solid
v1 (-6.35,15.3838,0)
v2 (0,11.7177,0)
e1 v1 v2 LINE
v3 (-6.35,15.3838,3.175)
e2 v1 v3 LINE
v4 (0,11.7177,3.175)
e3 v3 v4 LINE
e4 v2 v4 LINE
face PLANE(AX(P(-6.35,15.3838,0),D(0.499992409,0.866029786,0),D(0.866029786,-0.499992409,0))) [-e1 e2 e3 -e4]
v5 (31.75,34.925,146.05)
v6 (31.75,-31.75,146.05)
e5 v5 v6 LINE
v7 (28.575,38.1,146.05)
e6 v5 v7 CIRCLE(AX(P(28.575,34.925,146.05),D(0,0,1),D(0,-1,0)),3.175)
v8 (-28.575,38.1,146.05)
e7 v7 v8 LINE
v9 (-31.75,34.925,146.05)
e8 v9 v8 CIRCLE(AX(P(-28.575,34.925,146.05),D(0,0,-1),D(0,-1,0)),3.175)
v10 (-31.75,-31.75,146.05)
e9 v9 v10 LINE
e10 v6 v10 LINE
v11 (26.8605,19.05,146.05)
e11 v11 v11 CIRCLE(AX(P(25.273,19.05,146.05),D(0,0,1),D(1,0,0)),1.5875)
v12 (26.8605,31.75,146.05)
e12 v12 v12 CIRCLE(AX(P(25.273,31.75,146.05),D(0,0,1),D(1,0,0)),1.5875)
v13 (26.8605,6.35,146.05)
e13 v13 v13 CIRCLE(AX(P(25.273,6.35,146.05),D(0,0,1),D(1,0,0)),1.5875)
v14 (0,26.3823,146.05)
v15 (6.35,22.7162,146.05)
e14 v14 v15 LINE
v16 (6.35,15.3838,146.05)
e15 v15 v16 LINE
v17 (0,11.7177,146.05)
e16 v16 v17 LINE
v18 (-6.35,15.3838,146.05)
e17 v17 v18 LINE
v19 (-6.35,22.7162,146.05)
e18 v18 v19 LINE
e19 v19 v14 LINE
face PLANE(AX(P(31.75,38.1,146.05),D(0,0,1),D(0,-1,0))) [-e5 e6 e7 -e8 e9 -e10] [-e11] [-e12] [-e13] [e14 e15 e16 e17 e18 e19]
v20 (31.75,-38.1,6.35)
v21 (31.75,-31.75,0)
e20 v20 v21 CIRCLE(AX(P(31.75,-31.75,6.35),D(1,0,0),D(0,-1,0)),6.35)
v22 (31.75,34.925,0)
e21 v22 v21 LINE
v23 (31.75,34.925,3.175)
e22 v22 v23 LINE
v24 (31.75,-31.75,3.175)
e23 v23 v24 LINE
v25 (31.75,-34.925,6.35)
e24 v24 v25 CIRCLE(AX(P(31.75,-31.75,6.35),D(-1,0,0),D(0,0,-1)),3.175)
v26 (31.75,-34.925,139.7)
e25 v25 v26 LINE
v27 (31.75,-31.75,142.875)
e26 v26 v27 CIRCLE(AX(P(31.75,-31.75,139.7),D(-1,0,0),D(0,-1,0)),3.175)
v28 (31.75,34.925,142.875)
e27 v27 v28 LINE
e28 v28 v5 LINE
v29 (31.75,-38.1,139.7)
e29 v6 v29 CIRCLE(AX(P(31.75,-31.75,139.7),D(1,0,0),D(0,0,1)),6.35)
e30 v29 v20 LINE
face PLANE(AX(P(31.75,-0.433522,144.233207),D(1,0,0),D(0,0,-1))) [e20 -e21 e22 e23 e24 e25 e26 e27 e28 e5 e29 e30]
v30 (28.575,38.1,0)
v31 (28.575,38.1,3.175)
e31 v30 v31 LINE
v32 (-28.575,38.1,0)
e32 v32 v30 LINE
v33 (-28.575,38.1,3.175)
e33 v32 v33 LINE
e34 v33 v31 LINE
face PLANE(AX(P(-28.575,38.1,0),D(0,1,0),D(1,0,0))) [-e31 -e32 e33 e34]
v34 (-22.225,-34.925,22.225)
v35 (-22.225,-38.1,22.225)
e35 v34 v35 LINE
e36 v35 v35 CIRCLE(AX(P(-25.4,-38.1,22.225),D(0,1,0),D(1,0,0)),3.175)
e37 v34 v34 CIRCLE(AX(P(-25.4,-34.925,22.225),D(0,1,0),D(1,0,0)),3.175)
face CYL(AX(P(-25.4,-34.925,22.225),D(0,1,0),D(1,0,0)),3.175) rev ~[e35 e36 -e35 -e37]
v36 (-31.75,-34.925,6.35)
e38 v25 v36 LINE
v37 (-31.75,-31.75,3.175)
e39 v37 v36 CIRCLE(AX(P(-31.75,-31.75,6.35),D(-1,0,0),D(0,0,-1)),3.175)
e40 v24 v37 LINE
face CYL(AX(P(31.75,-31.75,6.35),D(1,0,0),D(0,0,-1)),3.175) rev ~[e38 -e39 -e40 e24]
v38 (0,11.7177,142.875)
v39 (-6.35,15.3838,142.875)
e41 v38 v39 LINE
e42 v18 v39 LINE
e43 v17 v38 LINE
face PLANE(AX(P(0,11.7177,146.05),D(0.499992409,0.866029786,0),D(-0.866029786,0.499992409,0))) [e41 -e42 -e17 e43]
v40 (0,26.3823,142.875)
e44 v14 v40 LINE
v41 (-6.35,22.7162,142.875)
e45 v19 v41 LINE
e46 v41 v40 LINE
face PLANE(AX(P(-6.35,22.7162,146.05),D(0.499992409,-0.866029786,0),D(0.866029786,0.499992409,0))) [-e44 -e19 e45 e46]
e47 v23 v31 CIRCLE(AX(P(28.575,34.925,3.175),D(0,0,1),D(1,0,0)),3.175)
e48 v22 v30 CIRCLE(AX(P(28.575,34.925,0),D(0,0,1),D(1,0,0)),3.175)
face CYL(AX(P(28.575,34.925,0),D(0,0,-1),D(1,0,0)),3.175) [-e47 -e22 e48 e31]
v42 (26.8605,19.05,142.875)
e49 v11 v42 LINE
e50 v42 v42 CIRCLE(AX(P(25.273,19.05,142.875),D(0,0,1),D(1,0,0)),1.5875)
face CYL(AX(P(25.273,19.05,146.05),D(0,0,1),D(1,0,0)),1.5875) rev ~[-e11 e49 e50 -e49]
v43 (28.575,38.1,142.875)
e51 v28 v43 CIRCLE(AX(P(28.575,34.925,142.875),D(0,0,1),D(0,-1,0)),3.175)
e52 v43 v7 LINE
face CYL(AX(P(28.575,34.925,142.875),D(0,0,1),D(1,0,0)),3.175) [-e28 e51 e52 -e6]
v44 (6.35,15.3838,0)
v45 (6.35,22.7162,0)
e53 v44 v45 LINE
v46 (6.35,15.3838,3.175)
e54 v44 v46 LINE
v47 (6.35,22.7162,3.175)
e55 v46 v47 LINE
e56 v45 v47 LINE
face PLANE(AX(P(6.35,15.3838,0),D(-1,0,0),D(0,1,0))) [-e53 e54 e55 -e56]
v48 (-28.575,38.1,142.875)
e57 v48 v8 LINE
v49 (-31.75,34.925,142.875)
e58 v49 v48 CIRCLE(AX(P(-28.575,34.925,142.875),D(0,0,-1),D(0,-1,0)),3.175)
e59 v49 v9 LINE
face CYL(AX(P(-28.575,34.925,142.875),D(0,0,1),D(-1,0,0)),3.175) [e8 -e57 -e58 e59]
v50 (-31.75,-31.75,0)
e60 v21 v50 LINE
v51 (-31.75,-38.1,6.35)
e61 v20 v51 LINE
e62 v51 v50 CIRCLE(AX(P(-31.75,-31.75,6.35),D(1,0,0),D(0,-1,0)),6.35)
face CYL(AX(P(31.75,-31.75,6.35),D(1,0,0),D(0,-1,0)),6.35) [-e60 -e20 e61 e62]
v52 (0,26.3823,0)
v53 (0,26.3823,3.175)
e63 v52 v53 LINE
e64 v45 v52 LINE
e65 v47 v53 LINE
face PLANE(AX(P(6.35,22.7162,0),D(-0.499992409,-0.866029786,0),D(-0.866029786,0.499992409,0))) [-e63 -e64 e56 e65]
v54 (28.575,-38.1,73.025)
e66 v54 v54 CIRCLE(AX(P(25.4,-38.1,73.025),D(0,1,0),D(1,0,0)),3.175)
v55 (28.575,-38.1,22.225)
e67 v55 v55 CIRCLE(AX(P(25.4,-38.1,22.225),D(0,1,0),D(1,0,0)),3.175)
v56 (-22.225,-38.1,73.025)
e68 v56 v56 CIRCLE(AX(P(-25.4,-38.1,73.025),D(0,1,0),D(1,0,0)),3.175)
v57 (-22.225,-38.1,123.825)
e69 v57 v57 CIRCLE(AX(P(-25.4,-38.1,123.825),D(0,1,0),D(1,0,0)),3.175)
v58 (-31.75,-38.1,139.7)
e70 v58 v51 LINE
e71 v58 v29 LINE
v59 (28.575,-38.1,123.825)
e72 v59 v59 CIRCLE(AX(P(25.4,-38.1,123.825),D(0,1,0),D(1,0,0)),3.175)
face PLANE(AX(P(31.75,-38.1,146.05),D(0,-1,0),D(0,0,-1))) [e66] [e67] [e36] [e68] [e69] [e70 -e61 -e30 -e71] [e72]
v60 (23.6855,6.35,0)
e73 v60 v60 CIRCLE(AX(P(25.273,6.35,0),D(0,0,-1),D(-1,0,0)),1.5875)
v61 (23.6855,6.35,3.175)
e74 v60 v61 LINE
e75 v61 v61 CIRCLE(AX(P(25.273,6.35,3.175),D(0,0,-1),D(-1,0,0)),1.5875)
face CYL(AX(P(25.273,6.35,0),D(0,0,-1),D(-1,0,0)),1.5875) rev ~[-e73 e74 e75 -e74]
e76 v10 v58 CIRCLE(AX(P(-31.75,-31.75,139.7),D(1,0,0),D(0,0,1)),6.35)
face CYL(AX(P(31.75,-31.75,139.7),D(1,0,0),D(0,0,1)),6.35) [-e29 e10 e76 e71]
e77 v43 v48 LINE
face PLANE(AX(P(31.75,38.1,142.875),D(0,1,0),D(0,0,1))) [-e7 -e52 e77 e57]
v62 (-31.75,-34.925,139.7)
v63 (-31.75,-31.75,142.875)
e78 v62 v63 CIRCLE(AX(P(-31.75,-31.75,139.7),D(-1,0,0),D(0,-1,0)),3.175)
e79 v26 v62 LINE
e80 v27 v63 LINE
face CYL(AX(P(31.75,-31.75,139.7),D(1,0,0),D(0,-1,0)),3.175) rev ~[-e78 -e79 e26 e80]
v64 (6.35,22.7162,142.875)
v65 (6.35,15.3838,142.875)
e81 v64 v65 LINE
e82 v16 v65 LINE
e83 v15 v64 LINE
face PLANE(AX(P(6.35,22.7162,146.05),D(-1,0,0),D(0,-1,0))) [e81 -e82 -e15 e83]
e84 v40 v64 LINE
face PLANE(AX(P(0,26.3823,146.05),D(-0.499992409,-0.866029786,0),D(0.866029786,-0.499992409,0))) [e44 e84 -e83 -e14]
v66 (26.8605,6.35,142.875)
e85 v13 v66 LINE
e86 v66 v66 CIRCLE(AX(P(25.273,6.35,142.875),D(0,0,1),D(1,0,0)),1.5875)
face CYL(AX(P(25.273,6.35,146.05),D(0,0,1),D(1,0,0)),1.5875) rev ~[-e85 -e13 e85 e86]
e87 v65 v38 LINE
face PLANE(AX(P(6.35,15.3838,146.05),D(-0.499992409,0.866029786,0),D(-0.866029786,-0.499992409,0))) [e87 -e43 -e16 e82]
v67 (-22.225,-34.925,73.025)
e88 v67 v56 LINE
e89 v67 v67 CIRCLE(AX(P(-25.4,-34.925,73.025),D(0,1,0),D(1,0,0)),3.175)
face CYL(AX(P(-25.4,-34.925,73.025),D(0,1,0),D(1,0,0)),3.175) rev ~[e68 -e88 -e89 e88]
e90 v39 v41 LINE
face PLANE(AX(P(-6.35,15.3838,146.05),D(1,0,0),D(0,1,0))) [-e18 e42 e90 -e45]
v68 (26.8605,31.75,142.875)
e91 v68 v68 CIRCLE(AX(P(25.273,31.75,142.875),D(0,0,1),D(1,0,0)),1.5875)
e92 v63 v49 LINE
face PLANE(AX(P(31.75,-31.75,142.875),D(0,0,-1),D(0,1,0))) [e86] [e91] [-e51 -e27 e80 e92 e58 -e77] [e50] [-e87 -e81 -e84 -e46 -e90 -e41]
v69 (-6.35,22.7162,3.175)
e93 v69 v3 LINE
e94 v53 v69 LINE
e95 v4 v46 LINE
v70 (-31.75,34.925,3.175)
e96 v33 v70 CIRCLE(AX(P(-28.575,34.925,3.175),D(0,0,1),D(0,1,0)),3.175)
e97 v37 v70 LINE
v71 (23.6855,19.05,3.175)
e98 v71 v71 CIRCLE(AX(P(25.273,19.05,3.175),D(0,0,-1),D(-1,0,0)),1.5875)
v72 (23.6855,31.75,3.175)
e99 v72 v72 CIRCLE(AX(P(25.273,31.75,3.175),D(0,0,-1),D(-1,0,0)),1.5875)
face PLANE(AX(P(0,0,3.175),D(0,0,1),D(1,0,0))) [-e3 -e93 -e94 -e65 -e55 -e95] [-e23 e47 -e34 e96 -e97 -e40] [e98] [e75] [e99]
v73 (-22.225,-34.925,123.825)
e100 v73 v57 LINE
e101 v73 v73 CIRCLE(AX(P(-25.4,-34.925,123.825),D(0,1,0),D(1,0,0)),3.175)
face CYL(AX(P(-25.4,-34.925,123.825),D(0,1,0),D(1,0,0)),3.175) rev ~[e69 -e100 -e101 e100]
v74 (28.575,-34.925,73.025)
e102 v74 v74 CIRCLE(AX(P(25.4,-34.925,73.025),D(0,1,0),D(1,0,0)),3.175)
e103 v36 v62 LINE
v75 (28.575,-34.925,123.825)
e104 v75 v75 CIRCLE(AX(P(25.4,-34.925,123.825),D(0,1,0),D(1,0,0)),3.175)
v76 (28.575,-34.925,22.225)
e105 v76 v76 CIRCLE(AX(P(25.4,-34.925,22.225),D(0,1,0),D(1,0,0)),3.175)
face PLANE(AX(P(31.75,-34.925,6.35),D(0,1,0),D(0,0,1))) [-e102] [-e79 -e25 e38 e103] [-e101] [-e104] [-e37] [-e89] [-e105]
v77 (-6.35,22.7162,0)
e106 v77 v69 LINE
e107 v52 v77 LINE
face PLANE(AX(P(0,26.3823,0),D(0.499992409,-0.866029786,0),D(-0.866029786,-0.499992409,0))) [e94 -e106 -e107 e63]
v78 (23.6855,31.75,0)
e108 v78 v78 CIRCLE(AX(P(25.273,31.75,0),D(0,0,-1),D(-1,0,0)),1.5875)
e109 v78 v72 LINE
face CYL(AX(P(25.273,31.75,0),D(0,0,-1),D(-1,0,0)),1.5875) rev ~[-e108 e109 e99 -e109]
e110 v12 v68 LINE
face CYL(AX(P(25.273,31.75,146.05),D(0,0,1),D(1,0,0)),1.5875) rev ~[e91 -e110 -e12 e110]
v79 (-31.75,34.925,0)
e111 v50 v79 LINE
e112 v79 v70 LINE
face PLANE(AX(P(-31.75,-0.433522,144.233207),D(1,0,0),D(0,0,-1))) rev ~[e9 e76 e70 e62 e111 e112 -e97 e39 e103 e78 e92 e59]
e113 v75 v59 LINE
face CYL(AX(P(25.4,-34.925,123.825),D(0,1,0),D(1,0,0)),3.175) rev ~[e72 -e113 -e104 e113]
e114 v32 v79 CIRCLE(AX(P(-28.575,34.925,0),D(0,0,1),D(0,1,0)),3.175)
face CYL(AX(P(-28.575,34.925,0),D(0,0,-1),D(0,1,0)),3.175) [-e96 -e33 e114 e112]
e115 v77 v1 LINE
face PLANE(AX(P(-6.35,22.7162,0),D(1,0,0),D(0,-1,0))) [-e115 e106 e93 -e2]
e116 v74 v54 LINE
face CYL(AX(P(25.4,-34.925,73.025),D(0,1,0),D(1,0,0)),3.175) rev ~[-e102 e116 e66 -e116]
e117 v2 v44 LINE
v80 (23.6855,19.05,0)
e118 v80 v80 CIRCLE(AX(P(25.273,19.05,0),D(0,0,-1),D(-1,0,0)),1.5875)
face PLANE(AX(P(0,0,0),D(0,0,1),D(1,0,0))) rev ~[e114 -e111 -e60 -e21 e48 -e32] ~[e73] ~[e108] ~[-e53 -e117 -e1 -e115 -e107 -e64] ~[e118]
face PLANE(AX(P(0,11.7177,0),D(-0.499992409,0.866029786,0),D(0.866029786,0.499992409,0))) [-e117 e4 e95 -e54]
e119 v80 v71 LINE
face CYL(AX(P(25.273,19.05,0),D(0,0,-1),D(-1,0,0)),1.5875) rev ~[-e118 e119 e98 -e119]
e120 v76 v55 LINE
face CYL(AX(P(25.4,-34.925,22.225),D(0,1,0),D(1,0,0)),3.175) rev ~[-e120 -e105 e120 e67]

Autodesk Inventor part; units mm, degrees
ref_plane "YZ Plane" through (0, 0, 0) normal (1, 0, 0) x (0, 1, 0)
ref_plane "XZ Plane" through (0, 0, 0) normal (0, 1, 0) x (-1, 0, 0)
ref_plane "XY Plane" through (0, 0, 0) normal (0, 0, 1) x (1, 0, 0)
sketch "Sketch1" plane through (0, 0, 0) normal (0, 0, 1) x (1, 0, 0)
  line L0 (31.75, -38.1) -> (-31.75, -38.1)
  line L1 (-31.75, -38.1) -> (-31.75, 34.925)
  line L2 (-28.575, 38.1) -> (28.575, 38.1)
  line L3 (31.75, 34.925) -> (31.75, -38.1)
  line L4 (31.75, -38.1) -> (-31.75, 38.1) construction
  line L5 (-31.75, -38.1) -> (31.75, 38.1) construction
  arc A0 (31.75, 34.925) -> (28.575, 38.1) centre (28.575, 34.925) ccw
  arc A1 (-28.575, 38.1) -> (-31.75, 34.925) centre (-28.575, 34.925) ccw
  point P0 (0, 0)
  dimension "d0" = 63.5
  dimension "d1" = 76.2
  dimension "d18" = 3.175
extrude "Plate1" add sketch "Sketch1" along normal blind 3.175
sketch "Sketch2" plane through (31.75, -34.925, 0) normal (0, -1, 0) x (1, 0, 0)
  line L0 (-63.5, 0) -> (0, 0)
  line L1 (0, 0) -> (0, 146.05)
  line L2 (0, 146.05) -> (-63.5, 146.05)
  line L3 (-63.5, 146.05) -> (-63.5, 0)
edge flange "Flange1" height 146.05 angle 90 thickness 3.175 bend radius 3.175 thickness toward (0, -1, 0) relief tear relief width 3.175 relief depth 1.5875 edges at (0, -38.1, 3.175) wall of the first edge with corners at (-31.75, -34.925, 0) (31.75, -34.925, 0) (31.75, -34.925, 146.05) (-31.75, -34.925, 146.05)
bend "Bend1"
corner "Corner1"
sketch "Sketch3" plane through (-31.75, -34.925, 146.05) normal (0, 1, 0) x (1, 0, 0)
  circle A0 centre (6.35, 22.225) radius 3.175
  line L0 (0, 0) -> (63.5, 0) projected
  line L1 (0, 0) -> (0, 139.7) projected
  line L2 (0, 0) -> (63.5, 0) projected
  circle A1 centre (6.35, 73.025) radius 3.175
  circle A2 centre (6.35, 123.825) radius 3.175
  circle A3 centre (57.15, 22.225) radius 3.175
  circle A4 centre (57.15, 73.025) radius 3.175
  circle A5 centre (57.15, 123.825) radius 3.175
  point P0 (31.75, 146.05)
  dimension "d13" = 6.35
  dimension "d15" = 6.35
  dimension "d39" = 50.8
  dimension "d42" = 50.8
  dimension "d46" = 22.225
extrude "Cut1" cut sketch "Sketch3" against normal blind 3.175
sketch "Sketch4" plane through (0, 0, 3.175) normal (0, 0, 1) x (1, 0, 0)
  line L0 (-28.575, 38.1) -> (28.575, 38.1) projected
sketch "Sketch5" plane through (-31.75, -38.1, 146.05) normal (0, 0, 1) x (1, 0, 0)
  line L0 (0, 6.35) -> (0, 73.025) projected
  arc A0 (3.175, 76.2) -> (0, 73.025) centre (3.175, 73.025) ccw projected
  line L1 (3.175, 76.2) -> (60.325, 76.2) projected
  arc A1 (63.5, 73.025) -> (60.325, 76.2) centre (60.325, 73.025) ccw projected
  line L2 (63.5, 73.025) -> (63.5, 6.35) projected
  line L3 (0, 0) -> (63.5, 0) projected
  line L4 (0, 3.175) -> (0, 0) projected
  line L5 (63.5, 3.175) -> (63.5, 0) projected
  line L6 (63.5, 3.175) -> (63.5, 6.35) projected
  line L7 (0, 3.175) -> (0, 6.35) projected
  line L8 (31.75, 64.4823) -> (38.1, 60.8162)
  line L9 (38.1, 60.8162) -> (38.1, 53.4838)
  line L10 (38.1, 53.4838) -> (31.75, 49.8177)
  line L11 (31.75, 49.8177) -> (25.4, 53.4838)
  line L12 (25.4, 53.4838) -> (25.4, 60.8162)
  line L13 (25.4, 60.8162) -> (31.75, 64.4823)
  point P0 (31.75, 57.15)
  dimension "d51" = 12.7
  dimension "d52" = 19.05
sketch "Sketch6" plane through (31.75, -38.1, 142.875) normal (0, 0, 1) x (1, 0, 0)
  line L0 (-63.5, 0) -> (0, 0)
  line L1 (0, 0) -> (0, 76.2)
  line L2 (0, 76.2) -> (-63.5, 76.2)
  line L3 (-63.5, 76.2) -> (-63.5, 0)
edge flange "Flange2" height 76.2 angle 90 thickness 3.175 bend radius 3.175 thickness toward (0, 0, 1) relief tear relief width 3.175 relief depth 1.5875 edges at (0, -34.925, 146.05) wall of the first edge with corners at (-31.75, -38.1, 142.875) (31.75, -38.1, 142.875) (31.75, 38.1, 142.875) (-31.75, 38.1, 142.875)
bend "Bend2"
corner "Corner2"
fillet "Corner Round1" radius 3.175 2 edges at (-31.75, 38.1, 144.4625) (31.75, 38.1, 144.4625)
extrude "Cut5" cut sketch "Sketch5" against normal blind 3.175 contours L8 L9 L10 L11 L12 L13
sketch "Sketch7" plane through (0, 0, 0) normal (0, 0, -1) x (-1, 0, 0)
  line L0 (0, 26.3823) -> (6.35, 22.7162) projected
  line L1 (-6.35, 22.7162) -> (0, 26.3823) projected
  line L2 (-6.35, 15.3838) -> (-6.35, 22.7162) projected
  line L3 (0, 11.7177) -> (-6.35, 15.3838) projected
  line L4 (6.35, 15.3838) -> (0, 11.7177) projected
  line L5 (6.35, 22.7162) -> (6.35, 15.3838) projected
  point P0 (0, 0)
extrude "Cut6" cut sketch "Sketch7" against normal blind 3.175
sketch "Sketch8" plane through (0, 0, 0) normal (0, 0, -1) x (-1, 0, 0)
  circle A0 centre (-25.273, 31.75) radius 1.5875
  circle A1 centre (-25.273, 19.05) radius 1.5875
  circle A2 centre (-25.273, 6.35) radius 1.5875
  line L0 (31.75, -31.75) -> (31.75, 34.925) projected
  line L1 (28.575, 38.1) -> (-28.575, 38.1) projected
  line L2 (-31.75, 34.925) -> (-31.75, -31.75) projected
  point P0 (0, 0)
  dimension "d57" = 3.175
  dimension "d58" = 3.175
  dimension "d59" = 3.175
  dimension "d61" = 6.35
  dimension "d62" = 12.7
  dimension "d63" = 12.7
  dimension "d68" = 6.477
extrude "Cut7" cut sketch "Sketch8" against normal blind 3.175
sketch "Sketch9" plane through (-31.75, -31.75, 146.05) normal (0, 0, 1) x (1, 0, 0)
  circle A0 centre (57.023, 38.1) radius 1.5875 projected
  circle A1 centre (57.023, 50.8) radius 1.5875 projected
  circle A2 centre (57.023, 63.5) radius 1.5875 projected
  circle A3 centre (57.023, 63.5) radius 1.5875
  circle A4 centre (57.023, 50.8) radius 1.5875
  circle A5 centre (57.023, 38.1) radius 1.5875
  point P0 (31.75, 31.75)
extrude "Cut8" cut sketch "Sketch9" against normal blind 3.175
equation "\"d16\" = Thickness"
equation "\"d53\" = Thickness"
equation "\"d55\" = Thickness"
equation "\"d64\" = Thickness"
equation "\"d66\" = Thickness"
equation "\"d3\" = BendReliefWidth"
equation "\"d4\" = BendReliefDepth"
equation "\"d5\" = MinimumRemnant"
equation "\"d6\" = BendRadius"
equation "\"d9\" = BendRadius"
equation "\"d10\" = CornerReliefSize"
equation "\"d11\" = GapSize"
equation "\"d12\" = JacobiRadiusSize"
equation "\"d24\" = BendReliefWidth"
equation "\"d25\" = BendReliefDepth"
equation "\"d26\" = MinimumRemnant"
equation "\"d27\" = BendRadius"
equation "\"d30\" = BendRadius"
equation "\"d31\" = CornerReliefSize"
equation "\"d32\" = GapSize"
equation "\"d33\" = JacobiRadiusSize"
equation "\"BendRadius\" = Thickness"
equation "\"BendReliefWidth\" = Thickness"
equation "\"BendReliefDepth\" = 0.5 * Thickness"
equation "\"CornerReliefSize\" = 4 * Thickness"
equation "\"MinimumRemnant\" = 2 * Thickness"
equation "\"TransitionRadius\" = BendRadius"
equation "\"JacobiRadiusSize\" = BendRadius"
equation "\"GapSize\" = Thickness"
equation "\"d2\" = BendRadius"
equation "\"Thickness\" = 3.175"
properties part number "334_18_0608_arm connection"
